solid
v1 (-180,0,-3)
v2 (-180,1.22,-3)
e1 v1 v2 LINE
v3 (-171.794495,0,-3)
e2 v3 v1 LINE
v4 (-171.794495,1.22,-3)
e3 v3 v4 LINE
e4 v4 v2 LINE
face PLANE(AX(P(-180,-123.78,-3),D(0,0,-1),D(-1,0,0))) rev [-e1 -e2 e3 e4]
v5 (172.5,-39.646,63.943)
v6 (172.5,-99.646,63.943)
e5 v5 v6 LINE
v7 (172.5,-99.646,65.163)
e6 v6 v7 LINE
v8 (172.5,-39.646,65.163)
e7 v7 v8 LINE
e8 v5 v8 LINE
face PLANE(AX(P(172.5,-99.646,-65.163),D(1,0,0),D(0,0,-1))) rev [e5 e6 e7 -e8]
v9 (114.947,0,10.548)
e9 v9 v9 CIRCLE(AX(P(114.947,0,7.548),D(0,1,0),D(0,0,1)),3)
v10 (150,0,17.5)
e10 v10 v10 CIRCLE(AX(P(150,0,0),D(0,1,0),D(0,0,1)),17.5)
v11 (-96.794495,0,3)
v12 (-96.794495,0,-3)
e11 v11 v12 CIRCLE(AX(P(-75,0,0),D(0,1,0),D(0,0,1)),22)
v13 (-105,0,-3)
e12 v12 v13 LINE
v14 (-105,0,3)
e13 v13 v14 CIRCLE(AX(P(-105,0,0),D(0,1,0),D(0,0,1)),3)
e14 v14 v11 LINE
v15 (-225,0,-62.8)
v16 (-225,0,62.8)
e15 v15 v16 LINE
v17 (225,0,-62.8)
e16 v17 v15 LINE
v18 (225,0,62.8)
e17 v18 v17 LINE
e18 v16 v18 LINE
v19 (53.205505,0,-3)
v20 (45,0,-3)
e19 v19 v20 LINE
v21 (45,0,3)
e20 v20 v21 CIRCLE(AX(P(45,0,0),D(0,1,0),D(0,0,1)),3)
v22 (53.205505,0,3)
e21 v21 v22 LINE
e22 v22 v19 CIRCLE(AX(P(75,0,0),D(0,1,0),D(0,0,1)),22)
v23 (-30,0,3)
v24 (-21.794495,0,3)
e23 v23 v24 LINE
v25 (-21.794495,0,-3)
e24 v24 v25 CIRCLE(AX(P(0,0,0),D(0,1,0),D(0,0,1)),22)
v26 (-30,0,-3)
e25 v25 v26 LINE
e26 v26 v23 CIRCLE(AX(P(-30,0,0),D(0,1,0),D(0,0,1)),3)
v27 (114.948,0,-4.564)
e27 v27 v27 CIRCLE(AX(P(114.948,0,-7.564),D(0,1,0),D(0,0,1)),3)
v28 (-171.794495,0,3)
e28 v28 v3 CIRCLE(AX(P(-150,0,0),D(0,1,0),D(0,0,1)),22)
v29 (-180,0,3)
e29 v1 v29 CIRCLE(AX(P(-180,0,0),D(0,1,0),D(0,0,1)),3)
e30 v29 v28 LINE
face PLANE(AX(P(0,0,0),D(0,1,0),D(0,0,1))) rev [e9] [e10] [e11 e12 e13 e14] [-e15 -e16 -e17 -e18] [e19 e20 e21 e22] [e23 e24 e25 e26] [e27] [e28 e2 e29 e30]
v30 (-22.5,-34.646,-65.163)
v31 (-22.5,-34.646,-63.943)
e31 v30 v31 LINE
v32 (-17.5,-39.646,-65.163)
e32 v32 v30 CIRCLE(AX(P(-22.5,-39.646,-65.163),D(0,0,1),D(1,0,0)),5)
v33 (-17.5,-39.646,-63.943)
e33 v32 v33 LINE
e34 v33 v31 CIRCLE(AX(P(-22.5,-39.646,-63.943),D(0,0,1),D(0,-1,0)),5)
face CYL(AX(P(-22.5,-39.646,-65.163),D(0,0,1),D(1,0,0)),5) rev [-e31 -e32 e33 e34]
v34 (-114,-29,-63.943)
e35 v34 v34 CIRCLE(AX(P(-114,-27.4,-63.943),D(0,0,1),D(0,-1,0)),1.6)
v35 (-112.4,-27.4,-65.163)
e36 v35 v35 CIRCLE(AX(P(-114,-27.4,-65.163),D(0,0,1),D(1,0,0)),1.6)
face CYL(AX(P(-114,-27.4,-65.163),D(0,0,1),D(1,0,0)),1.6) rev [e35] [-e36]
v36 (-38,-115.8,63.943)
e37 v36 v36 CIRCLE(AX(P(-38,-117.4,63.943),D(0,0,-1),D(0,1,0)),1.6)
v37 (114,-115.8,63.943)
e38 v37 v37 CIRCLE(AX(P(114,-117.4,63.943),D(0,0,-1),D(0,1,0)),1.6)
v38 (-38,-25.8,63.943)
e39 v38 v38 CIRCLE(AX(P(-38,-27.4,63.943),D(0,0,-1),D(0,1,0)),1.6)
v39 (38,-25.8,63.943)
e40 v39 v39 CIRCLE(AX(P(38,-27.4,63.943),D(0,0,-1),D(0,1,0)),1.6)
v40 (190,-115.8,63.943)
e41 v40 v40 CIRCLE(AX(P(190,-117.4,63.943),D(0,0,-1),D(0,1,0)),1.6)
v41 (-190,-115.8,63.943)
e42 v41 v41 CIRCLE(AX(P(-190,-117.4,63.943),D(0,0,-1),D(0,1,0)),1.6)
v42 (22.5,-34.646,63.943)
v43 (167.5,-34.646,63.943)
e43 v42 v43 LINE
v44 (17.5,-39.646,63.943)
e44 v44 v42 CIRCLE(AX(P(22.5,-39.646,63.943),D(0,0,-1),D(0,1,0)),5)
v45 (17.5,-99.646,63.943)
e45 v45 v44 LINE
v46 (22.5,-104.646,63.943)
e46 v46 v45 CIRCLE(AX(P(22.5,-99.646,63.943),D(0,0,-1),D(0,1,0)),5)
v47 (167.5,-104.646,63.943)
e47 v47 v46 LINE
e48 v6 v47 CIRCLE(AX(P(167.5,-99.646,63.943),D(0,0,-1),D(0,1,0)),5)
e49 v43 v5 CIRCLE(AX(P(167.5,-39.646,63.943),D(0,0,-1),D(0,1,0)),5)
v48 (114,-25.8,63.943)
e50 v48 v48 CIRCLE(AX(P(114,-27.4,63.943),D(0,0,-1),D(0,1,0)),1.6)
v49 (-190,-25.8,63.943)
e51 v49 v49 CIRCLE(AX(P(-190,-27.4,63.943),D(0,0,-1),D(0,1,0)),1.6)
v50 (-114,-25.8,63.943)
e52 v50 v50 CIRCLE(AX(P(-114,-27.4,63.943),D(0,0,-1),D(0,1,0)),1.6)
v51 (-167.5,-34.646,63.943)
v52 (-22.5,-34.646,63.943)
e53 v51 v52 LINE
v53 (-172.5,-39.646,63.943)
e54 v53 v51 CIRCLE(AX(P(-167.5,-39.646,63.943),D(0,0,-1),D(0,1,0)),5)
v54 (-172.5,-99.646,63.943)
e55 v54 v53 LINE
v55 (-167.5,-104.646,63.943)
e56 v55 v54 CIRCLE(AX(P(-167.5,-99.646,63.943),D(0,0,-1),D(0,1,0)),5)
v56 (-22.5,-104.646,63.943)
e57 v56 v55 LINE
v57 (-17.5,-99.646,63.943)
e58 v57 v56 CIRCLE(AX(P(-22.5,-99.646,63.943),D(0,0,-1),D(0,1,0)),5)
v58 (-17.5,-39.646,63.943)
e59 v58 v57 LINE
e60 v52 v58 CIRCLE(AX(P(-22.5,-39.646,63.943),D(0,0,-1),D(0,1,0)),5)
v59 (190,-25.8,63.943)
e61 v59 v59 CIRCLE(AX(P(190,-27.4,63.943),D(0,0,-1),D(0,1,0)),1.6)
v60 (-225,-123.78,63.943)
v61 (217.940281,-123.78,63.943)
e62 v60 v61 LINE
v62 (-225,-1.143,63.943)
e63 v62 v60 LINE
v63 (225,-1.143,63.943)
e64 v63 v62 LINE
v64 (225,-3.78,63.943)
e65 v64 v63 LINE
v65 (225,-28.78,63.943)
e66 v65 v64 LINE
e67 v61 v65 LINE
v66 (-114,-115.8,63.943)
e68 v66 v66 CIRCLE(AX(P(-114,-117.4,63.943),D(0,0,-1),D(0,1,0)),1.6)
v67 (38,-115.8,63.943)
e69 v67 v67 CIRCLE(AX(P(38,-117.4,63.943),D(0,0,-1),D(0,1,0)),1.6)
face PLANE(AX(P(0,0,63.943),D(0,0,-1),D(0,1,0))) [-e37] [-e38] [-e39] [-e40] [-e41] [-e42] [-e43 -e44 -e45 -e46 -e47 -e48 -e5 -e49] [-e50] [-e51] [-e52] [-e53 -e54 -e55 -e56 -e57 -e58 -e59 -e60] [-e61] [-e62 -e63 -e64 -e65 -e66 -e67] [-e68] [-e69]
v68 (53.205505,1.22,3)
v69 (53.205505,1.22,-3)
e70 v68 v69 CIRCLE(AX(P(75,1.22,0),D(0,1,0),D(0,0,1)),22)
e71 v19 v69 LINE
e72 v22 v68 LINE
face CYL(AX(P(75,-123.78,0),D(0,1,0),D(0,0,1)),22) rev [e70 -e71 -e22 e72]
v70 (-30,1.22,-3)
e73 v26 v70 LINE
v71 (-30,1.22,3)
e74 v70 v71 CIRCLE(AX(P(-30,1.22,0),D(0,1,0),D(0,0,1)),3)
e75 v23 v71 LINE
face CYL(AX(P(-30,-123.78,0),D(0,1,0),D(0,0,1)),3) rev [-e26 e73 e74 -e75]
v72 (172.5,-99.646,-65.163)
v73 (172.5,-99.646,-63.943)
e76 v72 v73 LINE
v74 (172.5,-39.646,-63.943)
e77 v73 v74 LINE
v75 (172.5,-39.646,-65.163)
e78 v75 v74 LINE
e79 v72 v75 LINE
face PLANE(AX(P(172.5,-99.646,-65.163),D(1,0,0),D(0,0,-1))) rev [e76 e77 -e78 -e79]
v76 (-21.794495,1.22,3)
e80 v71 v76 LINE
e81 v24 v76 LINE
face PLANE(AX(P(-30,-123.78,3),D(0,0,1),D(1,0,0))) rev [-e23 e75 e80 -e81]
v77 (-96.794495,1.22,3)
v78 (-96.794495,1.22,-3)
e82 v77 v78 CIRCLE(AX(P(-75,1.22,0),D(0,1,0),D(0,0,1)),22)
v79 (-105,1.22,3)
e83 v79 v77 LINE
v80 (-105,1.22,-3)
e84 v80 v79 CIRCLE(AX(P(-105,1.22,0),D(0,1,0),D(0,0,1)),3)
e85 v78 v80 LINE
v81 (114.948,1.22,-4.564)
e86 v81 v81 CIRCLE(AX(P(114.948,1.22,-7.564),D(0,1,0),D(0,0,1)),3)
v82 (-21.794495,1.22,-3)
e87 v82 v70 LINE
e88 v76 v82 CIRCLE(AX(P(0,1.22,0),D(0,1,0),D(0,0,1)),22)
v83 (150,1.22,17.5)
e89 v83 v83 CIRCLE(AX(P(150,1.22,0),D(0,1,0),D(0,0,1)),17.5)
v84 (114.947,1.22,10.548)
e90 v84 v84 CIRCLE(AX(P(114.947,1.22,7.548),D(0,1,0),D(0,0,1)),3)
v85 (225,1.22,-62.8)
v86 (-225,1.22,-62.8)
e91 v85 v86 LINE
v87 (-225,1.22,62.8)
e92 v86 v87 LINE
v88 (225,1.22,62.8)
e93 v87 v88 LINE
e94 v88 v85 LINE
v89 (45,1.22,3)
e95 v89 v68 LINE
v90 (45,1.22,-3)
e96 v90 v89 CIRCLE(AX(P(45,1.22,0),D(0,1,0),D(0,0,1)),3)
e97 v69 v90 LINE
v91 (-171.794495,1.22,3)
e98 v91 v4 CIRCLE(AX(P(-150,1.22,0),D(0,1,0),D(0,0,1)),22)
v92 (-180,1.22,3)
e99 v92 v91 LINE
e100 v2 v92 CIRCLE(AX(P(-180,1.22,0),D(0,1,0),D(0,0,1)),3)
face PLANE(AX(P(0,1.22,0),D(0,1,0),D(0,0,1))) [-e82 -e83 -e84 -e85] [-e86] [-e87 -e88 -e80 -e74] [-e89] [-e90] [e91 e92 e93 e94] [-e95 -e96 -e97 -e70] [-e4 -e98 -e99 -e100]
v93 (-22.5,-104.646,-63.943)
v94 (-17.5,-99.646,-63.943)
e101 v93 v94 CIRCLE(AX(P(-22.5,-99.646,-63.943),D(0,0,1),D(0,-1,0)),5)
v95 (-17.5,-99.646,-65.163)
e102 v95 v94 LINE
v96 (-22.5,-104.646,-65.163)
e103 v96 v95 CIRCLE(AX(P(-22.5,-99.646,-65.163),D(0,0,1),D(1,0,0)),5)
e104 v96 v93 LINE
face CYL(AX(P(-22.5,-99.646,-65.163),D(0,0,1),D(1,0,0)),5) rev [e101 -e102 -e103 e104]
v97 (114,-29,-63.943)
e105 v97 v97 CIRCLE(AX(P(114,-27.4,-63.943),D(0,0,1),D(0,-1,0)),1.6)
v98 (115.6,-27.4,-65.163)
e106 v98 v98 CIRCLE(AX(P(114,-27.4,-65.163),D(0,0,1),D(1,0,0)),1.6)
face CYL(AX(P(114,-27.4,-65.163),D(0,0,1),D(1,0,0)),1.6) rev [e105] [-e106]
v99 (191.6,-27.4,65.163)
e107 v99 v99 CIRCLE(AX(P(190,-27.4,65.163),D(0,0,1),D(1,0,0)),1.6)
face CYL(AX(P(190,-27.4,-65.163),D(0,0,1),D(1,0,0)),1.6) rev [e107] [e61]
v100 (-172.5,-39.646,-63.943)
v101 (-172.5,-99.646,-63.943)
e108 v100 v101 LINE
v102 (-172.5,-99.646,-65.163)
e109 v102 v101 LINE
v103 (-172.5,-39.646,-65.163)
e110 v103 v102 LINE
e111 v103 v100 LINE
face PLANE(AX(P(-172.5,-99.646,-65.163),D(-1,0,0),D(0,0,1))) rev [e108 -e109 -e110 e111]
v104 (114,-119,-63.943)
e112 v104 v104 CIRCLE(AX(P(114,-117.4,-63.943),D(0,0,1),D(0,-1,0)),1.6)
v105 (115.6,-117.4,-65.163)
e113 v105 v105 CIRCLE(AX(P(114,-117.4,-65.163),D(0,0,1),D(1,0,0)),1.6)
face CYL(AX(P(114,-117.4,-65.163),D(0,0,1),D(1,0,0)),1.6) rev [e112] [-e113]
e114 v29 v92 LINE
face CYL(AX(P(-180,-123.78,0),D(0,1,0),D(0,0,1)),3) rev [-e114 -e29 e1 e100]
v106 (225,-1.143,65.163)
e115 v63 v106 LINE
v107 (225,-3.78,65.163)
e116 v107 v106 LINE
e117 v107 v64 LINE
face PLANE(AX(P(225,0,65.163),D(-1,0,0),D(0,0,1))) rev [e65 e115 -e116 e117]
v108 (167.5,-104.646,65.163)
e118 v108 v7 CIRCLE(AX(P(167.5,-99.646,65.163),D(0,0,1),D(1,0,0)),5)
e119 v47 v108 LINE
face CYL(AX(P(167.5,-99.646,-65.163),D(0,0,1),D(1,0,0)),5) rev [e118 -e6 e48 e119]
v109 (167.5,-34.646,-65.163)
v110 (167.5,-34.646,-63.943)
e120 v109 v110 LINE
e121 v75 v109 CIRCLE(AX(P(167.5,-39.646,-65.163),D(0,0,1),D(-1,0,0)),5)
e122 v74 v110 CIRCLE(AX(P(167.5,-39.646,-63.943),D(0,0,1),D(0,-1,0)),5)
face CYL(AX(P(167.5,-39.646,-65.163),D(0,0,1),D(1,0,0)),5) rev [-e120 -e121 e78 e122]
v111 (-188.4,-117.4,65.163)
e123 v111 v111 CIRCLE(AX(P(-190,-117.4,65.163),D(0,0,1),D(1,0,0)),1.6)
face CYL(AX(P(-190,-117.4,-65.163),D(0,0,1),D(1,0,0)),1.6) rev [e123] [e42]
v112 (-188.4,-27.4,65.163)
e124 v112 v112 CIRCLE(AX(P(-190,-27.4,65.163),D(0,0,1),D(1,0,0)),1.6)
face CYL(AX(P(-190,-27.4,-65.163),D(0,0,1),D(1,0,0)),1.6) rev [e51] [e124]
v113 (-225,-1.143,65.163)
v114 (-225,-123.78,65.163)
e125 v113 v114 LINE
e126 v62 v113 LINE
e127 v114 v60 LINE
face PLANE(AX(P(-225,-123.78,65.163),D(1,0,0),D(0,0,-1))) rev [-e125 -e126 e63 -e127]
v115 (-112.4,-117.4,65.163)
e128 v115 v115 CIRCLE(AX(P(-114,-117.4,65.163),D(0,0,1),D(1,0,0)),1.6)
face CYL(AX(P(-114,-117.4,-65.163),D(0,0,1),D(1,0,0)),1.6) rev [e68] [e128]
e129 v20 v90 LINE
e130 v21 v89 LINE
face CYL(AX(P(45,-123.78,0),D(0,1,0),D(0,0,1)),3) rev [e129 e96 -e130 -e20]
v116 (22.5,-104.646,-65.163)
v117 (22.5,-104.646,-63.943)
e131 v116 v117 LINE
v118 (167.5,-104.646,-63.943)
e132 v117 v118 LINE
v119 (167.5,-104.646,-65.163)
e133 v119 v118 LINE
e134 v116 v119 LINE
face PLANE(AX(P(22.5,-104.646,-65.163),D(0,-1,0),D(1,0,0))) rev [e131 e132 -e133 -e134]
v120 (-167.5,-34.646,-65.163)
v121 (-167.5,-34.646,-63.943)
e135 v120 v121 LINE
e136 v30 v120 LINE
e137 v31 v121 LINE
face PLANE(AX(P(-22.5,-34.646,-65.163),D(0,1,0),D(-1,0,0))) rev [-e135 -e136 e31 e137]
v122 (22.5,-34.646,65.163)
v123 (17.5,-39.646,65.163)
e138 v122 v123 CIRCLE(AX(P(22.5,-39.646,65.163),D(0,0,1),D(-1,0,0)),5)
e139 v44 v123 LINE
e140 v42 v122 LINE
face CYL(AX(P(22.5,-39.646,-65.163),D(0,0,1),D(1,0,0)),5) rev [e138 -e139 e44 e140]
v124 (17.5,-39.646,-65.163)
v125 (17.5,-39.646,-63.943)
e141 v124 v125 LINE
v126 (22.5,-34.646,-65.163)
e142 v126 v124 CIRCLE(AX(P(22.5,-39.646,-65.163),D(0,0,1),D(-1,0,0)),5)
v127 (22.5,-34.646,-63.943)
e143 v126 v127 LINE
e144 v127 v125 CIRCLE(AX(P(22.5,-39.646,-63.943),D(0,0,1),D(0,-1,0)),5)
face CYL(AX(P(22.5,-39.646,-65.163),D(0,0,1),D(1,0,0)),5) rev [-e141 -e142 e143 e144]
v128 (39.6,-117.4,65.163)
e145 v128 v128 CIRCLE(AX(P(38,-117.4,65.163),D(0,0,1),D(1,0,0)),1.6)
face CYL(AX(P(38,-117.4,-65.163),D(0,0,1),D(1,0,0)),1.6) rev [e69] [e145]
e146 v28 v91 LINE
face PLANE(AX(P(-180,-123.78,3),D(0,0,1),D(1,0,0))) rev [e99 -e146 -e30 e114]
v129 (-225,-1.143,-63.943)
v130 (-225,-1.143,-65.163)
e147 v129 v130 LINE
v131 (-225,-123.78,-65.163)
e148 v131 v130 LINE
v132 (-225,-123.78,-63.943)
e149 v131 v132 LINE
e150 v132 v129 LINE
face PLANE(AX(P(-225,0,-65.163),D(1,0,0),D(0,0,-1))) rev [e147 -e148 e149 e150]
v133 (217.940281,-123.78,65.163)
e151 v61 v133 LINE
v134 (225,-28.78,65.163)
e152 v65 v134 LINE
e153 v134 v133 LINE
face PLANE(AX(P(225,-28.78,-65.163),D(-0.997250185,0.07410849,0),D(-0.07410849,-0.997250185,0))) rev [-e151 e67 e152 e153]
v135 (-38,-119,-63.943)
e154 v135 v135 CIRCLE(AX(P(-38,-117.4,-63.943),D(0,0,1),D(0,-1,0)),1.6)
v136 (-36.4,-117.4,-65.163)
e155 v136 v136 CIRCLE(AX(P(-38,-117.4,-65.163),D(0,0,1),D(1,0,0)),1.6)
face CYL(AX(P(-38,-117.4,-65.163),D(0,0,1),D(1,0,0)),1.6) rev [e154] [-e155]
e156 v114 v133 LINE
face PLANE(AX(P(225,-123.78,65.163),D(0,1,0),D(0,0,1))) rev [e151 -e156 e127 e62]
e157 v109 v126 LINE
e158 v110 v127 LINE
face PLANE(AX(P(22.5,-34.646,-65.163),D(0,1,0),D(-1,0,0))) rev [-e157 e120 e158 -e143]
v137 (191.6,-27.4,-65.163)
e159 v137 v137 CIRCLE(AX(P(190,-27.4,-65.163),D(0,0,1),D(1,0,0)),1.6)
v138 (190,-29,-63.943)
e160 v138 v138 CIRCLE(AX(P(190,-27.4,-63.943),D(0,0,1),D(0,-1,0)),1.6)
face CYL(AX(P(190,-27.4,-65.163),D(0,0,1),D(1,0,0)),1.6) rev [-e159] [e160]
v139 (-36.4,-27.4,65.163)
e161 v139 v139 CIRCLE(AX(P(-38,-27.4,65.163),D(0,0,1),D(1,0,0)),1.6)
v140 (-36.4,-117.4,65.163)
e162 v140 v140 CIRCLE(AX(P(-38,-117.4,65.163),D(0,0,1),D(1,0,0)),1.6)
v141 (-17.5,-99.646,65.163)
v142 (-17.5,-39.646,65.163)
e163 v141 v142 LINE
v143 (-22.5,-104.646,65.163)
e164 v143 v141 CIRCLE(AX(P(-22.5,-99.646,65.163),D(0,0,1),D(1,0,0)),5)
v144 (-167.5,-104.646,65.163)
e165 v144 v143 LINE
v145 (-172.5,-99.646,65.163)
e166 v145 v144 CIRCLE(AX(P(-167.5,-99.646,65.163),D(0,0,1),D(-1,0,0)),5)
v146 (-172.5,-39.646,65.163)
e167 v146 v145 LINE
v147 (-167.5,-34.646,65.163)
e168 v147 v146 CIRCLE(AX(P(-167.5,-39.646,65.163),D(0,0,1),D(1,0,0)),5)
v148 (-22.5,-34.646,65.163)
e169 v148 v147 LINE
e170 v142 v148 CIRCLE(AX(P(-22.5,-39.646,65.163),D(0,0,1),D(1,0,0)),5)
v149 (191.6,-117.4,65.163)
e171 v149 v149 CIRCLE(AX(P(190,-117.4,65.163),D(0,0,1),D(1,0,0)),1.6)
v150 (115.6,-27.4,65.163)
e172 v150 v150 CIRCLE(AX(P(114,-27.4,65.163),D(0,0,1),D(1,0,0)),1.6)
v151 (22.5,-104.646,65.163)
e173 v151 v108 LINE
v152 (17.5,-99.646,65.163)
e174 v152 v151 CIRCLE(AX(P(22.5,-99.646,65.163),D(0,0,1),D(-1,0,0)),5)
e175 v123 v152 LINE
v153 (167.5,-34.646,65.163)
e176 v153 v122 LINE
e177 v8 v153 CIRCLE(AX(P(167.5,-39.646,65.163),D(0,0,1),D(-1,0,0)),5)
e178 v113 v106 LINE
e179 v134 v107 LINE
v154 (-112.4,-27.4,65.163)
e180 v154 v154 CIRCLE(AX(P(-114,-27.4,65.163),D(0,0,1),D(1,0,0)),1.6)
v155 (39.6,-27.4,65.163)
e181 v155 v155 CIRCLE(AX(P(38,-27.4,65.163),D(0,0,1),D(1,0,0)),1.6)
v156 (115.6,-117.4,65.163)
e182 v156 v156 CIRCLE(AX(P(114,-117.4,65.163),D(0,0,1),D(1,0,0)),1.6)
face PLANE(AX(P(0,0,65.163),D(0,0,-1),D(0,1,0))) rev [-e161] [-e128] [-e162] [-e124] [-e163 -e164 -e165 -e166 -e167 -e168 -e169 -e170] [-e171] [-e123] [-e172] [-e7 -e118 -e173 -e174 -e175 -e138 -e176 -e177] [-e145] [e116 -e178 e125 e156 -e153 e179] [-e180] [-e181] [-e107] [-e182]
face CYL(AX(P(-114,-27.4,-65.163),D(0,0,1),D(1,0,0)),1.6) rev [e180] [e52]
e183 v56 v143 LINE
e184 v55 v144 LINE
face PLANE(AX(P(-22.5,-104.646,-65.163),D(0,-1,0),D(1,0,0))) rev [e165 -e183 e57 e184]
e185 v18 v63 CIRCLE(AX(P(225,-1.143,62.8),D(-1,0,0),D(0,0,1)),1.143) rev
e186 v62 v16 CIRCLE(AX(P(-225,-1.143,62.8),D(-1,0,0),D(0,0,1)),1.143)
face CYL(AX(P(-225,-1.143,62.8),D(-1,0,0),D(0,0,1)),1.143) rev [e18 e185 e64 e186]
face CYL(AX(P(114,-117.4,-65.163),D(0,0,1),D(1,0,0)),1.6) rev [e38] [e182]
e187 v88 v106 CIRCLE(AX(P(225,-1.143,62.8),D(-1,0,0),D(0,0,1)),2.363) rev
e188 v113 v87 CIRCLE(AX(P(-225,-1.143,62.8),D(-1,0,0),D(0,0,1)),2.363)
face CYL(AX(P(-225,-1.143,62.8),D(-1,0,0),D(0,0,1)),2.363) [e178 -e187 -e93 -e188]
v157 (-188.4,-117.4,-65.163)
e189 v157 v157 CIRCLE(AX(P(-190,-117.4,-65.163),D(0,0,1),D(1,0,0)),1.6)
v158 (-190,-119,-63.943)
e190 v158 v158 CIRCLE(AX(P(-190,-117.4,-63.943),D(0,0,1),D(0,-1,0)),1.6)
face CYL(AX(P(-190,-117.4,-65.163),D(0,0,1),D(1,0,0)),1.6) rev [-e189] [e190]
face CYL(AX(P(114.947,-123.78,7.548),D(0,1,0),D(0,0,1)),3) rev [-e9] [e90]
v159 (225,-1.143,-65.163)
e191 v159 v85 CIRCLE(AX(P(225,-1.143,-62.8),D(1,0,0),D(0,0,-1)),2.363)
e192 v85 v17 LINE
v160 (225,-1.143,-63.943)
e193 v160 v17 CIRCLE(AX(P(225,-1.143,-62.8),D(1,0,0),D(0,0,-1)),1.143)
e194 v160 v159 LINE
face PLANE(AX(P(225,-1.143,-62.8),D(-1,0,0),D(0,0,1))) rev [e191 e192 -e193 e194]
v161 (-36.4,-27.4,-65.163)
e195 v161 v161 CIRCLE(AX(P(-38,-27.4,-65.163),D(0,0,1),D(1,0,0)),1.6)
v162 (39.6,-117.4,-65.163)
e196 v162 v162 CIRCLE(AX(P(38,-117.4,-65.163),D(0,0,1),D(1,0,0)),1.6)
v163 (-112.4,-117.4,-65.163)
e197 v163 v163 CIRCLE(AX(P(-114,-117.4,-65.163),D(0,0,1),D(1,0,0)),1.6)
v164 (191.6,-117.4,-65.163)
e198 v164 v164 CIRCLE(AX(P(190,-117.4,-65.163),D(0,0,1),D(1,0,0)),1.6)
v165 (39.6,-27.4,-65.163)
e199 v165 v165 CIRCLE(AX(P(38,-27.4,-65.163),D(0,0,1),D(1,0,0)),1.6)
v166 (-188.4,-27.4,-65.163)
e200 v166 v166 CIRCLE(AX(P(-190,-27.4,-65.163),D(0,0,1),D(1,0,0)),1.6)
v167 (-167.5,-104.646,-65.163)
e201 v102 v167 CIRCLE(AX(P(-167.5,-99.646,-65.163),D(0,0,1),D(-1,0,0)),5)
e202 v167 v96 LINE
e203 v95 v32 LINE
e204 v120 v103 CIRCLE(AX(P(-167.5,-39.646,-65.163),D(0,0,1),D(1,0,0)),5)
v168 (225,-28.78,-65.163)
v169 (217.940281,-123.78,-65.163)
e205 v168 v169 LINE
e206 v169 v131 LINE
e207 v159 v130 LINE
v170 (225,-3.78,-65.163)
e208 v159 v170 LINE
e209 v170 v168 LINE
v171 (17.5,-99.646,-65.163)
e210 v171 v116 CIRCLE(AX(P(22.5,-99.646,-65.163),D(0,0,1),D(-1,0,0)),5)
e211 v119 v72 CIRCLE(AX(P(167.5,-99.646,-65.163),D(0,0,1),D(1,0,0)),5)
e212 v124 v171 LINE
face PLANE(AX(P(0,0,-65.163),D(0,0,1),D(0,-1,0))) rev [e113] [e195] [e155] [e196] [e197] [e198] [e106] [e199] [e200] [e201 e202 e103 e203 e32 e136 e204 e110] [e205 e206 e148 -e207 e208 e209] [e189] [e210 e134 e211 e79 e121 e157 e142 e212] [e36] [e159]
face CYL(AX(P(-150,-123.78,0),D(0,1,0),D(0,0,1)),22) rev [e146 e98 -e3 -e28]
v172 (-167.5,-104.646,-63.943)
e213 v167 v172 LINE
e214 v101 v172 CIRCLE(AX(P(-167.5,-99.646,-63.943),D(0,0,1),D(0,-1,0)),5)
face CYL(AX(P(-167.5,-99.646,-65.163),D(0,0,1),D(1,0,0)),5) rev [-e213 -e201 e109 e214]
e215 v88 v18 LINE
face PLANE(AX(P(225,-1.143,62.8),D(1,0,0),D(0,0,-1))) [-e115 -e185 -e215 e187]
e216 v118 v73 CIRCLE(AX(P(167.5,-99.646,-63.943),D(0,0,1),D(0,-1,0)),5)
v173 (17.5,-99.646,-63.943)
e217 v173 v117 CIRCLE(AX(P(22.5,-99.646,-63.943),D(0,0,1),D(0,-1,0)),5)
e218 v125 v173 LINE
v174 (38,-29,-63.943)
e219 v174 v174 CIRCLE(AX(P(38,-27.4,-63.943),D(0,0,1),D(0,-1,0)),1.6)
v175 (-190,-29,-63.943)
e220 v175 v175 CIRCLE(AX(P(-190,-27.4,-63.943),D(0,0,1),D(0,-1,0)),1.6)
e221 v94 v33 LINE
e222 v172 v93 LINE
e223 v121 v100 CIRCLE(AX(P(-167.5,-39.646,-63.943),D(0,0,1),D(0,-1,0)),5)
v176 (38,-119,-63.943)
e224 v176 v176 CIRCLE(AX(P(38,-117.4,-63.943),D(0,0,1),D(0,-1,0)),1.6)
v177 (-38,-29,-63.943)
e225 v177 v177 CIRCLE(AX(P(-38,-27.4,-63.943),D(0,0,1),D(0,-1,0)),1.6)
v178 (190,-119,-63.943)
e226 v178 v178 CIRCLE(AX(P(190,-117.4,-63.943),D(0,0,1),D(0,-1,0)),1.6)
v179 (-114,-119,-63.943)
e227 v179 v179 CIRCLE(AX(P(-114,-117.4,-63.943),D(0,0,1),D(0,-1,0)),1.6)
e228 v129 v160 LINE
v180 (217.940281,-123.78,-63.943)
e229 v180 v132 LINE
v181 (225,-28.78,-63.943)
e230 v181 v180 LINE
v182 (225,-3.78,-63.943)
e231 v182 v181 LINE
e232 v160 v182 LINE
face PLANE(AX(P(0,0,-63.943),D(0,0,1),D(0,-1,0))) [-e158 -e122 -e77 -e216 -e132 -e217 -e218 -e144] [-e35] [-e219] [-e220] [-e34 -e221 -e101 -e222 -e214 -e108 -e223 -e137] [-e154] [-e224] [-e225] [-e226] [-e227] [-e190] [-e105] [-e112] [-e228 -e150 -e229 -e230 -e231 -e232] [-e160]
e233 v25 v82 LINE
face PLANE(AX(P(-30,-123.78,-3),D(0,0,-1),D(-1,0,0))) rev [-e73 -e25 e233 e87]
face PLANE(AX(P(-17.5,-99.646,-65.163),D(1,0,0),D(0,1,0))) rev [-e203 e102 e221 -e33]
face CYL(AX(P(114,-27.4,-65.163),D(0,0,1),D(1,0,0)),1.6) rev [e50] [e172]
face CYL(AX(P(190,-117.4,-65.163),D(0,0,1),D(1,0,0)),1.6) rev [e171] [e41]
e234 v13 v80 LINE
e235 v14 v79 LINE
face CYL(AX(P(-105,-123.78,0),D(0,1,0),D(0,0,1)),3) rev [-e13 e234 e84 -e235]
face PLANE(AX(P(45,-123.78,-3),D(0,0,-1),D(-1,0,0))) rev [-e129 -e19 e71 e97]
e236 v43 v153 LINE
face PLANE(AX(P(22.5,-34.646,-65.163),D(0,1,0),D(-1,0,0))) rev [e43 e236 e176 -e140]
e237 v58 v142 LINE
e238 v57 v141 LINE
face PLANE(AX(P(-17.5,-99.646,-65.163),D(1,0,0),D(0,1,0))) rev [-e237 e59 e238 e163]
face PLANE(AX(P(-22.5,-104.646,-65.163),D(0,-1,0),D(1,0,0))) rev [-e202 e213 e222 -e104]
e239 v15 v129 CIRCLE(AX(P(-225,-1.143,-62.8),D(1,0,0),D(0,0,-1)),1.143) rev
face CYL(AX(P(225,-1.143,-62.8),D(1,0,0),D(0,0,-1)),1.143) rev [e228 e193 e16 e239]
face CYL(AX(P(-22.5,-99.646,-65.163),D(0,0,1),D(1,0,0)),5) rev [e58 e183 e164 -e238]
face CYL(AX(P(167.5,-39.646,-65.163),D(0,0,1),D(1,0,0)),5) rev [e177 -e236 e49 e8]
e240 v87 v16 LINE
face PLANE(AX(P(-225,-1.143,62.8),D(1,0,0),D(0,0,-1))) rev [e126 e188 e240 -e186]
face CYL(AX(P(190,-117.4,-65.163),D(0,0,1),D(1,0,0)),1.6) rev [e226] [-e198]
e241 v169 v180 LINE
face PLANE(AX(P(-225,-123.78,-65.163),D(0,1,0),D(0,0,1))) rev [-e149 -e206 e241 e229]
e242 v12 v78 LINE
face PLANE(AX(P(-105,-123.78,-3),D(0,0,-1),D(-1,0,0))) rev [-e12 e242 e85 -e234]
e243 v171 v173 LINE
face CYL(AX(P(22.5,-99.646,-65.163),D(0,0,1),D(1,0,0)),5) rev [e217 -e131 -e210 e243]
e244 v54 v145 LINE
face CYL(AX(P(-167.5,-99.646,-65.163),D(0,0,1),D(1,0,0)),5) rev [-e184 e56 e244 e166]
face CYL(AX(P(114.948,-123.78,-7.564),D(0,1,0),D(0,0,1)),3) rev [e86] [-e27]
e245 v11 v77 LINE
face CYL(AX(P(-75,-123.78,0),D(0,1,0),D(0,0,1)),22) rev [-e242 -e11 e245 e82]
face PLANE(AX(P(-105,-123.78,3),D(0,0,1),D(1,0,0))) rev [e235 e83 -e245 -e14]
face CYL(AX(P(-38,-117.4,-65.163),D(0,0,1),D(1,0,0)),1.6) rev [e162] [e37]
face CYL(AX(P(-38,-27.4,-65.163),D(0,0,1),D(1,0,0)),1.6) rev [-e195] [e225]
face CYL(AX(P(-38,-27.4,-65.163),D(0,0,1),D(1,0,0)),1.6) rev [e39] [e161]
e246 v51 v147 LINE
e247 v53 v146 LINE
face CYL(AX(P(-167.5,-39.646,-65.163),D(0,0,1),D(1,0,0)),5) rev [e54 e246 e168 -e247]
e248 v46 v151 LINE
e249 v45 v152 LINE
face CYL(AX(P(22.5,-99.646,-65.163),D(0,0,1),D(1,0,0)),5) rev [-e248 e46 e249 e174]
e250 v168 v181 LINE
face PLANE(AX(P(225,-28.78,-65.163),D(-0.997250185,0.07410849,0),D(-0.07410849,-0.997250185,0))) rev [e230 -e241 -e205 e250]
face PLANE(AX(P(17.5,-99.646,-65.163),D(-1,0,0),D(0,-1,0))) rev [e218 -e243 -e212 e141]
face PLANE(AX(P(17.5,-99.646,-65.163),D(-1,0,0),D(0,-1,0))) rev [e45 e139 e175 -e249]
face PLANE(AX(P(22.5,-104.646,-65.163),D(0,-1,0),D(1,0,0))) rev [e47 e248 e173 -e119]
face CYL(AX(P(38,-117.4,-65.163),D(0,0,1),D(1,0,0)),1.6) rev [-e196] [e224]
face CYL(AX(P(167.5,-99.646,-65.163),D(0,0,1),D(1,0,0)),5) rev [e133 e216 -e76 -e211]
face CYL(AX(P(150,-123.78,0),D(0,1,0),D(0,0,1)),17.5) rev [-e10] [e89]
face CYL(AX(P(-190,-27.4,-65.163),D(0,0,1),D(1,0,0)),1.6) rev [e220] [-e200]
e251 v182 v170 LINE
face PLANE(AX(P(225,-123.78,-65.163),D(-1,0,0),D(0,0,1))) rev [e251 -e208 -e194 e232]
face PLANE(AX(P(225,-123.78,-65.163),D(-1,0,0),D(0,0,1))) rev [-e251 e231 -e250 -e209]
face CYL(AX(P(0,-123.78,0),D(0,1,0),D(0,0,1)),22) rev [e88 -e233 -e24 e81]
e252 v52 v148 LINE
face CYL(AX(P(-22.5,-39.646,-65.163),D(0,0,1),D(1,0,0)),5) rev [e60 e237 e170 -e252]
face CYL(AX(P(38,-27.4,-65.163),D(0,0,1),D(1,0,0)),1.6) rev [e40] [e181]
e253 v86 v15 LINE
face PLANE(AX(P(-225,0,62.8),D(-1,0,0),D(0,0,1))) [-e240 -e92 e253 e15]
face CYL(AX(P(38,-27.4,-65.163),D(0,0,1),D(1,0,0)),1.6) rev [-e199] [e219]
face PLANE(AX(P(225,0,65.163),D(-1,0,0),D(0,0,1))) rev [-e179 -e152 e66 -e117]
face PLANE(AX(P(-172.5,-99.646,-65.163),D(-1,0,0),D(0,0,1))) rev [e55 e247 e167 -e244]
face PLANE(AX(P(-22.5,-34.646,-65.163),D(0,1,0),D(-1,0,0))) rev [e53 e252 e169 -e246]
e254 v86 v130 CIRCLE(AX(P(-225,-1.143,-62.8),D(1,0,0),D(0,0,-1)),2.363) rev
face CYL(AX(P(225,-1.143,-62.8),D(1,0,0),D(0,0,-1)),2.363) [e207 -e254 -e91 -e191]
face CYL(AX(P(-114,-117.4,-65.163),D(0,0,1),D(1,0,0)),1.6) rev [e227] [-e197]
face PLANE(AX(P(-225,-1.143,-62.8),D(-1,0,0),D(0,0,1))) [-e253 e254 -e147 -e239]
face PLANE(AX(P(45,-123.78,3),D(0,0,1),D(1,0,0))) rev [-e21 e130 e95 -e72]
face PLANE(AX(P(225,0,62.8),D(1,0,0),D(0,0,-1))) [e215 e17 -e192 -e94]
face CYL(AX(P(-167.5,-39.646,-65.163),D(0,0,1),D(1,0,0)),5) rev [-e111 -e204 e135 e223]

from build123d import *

# Parameters (mm, degrees)
SKETCH1_W               = 450
SKETCH1_H               = 125.6
BOSS_EXTRUDE1_DEPTH     = 1.22
EDGE_FLANGE1_DEPTH      = 450
EDGE_FLANGE1_BEND_DEPTH = 450
CUT_EXTRUDE1_DEPTH      = 265.939058972
CUT_EXTRUDE1_DEPTH_BACK = 265.939058972
CUT_EXTRUDE2_DEPTH      = 266.511236239
CUT_EXTRUDE2_DEPTH_BACK = 266.511236239
SKETCH13_R              = 17.5
SKETCH13_R_2            = 3
CUT_EXTRUDE3_DEPTH      = 265.939058972
CUT_EXTRUDE3_DEPTH_BACK = 265.939058972
CUT_EXTRUDE4_DEPTH      = 265.939058972
CUT_EXTRUDE4_DEPTH_BACK = 265.939058972
SKETCH17_R              = 1.6


# Sheet-metal steps are written as plain solids
with BuildPart() as part:
    # Sketch1 → Boss-Extrude1 (new body)
    with BuildSketch(Plane(origin=(0, 0, 0), x_dir=(1, 0, 0), z_dir=(0, 1, 0))):
        Rectangle(SKETCH1_W, SKETCH1_H)
    extrude(amount=BOSS_EXTRUDE1_DEPTH)

    # Edge-Flange1 section (across the edge) → Edge-Flange1 (add)
    with BuildSketch(Plane(origin=(225, 0, 63.943), x_dir=(0, 0, -1), z_dir=(-1, 0, 0))):
        with BuildLine():
            Line((-1.22, 1.143), (-1.22, 123.78))
            Line((-1.22, 123.78), (0, 123.78))
            Line((0, 123.78), (0, 1.143))
            ThreePointArc((0, 1.143), (0.334776949, 0.334776949), (1.143, 0))
            Line((1.143, 0), (1.143, -1.22))
            ThreePointArc((1.143, -1.22), (-0.527893324, -0.527893324), (-1.22, 1.143))
        make_face()
    extrude(amount=EDGE_FLANGE1_DEPTH)

    # Edge-Flange1 section 2 (across the edge) → Edge-Flange1 bend (add)
    with BuildSketch(Plane(origin=(-225, 0, -63.943), x_dir=(0, 0, 1), z_dir=(1, 0, 0))):
        with BuildLine():
            Line((-1.22, 1.143), (-1.22, 123.78))
            Line((-1.22, 123.78), (0, 123.78))
            Line((0, 123.78), (0, 1.143))
            ThreePointArc((0, 1.143), (0.334776949, 0.334776949), (1.143, 0))
            Line((1.143, 0), (1.143, -1.22))
            ThreePointArc((1.143, -1.22), (-0.527893324, -0.527893324), (-1.22, 1.143))
        make_face()
    extrude(amount=EDGE_FLANGE1_BEND_DEPTH)

    # Sketch12 → Cut-Extrude1 (cut, two sides: drawn at the far end of the back side and taken through both)
    with BuildSketch(Plane.XY.offset(-CUT_EXTRUDE1_DEPTH_BACK)):
        Polygon((225, -3.78), (225, -28.78), (210.508996835, -223.78), (210.508996835, -248.78), (235.508996835, -248.78), (235.508996835, -3.78), align=None)
    extrude(amount=CUT_EXTRUDE1_DEPTH + CUT_EXTRUDE1_DEPTH_BACK, mode=Mode.SUBTRACT)

    # Sketch13 → Cut-Extrude2 (cut, two sides: drawn at the far end of the back side and taken through both)
    with BuildSketch(Plane(origin=(0, 1.22, 0), x_dir=(1, 0, 0), z_dir=(0, 1, 0)).offset(-CUT_EXTRUDE2_DEPTH_BACK)):
        with Locations(Location((150, 0, 0), (0, 0, 270))):
            Circle(SKETCH13_R)
        with Locations(Location((114.948, 7.564, 0), (0, 0, 270))):
            Circle(SKETCH13_R_2)
        with Locations(Location((114.947, -7.548, 0), (0, 0, 270))):
            Circle(SKETCH13_R_2)
        with BuildLine():
            Line((45, 3), (53.205505282, 3))
            ThreePointArc((53.205505282, 3), (97, 0), (53.205505282, -3))
            Line((53.205505282, -3), (45, -3))
            ThreePointArc((45, -3), (42, 0), (45, 3))
        make_face()
        with BuildLine():
            Line((-30, 3), (-21.794494718, 3))
            ThreePointArc((-21.794494718, 3), (22, 0), (-21.794494718, -3))
            Line((-21.794494718, -3), (-30, -3))
            ThreePointArc((-30, -3), (-33, 0), (-30, 3))
        make_face()
        with BuildLine():
            Line((-105, 3), (-96.794494718, 3))
            ThreePointArc((-96.794494718, 3), (-53, 0), (-96.794494718, -3))
            Line((-96.794494718, -3), (-105, -3))
            ThreePointArc((-105, -3), (-108, 0), (-105, 3))
        make_face()
        with BuildLine():
            Line((-180, 3), (-171.794494718, 3))
            ThreePointArc((-171.794494718, 3), (-128, 0), (-171.794494718, -3))
            Line((-171.794494718, -3), (-180, -3))
            ThreePointArc((-180, -3), (-183, 0), (-180, 3))
        make_face()
    extrude(amount=CUT_EXTRUDE2_DEPTH + CUT_EXTRUDE2_DEPTH_BACK, mode=Mode.SUBTRACT)

    # Sketch16 → Cut-Extrude3 (cut, two sides: drawn at the far end of the back side and taken through both)
    with BuildSketch(Plane.XY.offset(-CUT_EXTRUDE3_DEPTH_BACK)):
        with BuildLine():
            Line((-22.5, -104.646), (-167.5, -104.646))
            ThreePointArc((-167.5, -104.646), (-171.035533906, -103.181533906), (-172.5, -99.646))
            Line((-172.5, -99.646), (-172.5, -39.646))
            ThreePointArc((-172.5, -39.646), (-171.035533906, -36.110466094), (-167.5, -34.646))
            Line((-167.5, -34.646), (-22.5, -34.646))
            ThreePointArc((-22.5, -34.646), (-18.964466094, -36.110466094), (-17.5, -39.646))
            Line((-17.5, -39.646), (-17.5, -99.646))
            ThreePointArc((-17.5, -99.646), (-18.964466094, -103.181533906), (-22.5, -104.646))
        make_face()
        with BuildLine():
            Line((172.5, -99.646), (172.5, -39.646))
            ThreePointArc((172.5, -39.646), (171.035533906, -36.110466094), (167.5, -34.646))
            Line((167.5, -34.646), (22.5, -34.646))
            ThreePointArc((22.5, -34.646), (18.964466094, -36.110466094), (17.5, -39.646))
            Line((17.5, -39.646), (17.5, -99.646))
            ThreePointArc((17.5, -99.646), (18.964466094, -103.181533906), (22.5, -104.646))
            Line((22.5, -104.646), (167.5, -104.646))
            ThreePointArc((167.5, -104.646), (171.035533906, -103.181533906), (172.5, -99.646))
        make_face()
    extrude(amount=CUT_EXTRUDE3_DEPTH + CUT_EXTRUDE3_DEPTH_BACK, mode=Mode.SUBTRACT)

    # Sketch17 → Cut-Extrude4 (cut, two sides: drawn at the far end of the back side and taken through both)
    with BuildSketch(Plane.XY.offset(-CUT_EXTRUDE4_DEPTH_BACK)):
        with Locations((-190, -27.4)):
            Circle(SKETCH17_R)
        with Locations((-114, -27.4)):
            Circle(SKETCH17_R)
        with Locations((-38, -27.4)):
            Circle(SKETCH17_R)
        with Locations((38, -27.4)):
            Circle(SKETCH17_R)
        with Locations((114, -27.4)):
            Circle(SKETCH17_R)
        with Locations((190, -27.4)):
            Circle(SKETCH17_R)
        with Locations((190, -117.4)):
            Circle(SKETCH17_R)
        with Locations((114, -117.4)):
            Circle(SKETCH17_R)
        with Locations((38, -117.4)):
            Circle(SKETCH17_R)
        with Locations((-38, -117.4)):
            Circle(SKETCH17_R)
        with Locations((-114, -117.4)):
            Circle(SKETCH17_R)
        with Locations((-190, -117.4)):
            Circle(SKETCH17_R)
    extrude(amount=CUT_EXTRUDE4_DEPTH + CUT_EXTRUDE4_DEPTH_BACK, mode=Mode.SUBTRACT)


solid = part.part
